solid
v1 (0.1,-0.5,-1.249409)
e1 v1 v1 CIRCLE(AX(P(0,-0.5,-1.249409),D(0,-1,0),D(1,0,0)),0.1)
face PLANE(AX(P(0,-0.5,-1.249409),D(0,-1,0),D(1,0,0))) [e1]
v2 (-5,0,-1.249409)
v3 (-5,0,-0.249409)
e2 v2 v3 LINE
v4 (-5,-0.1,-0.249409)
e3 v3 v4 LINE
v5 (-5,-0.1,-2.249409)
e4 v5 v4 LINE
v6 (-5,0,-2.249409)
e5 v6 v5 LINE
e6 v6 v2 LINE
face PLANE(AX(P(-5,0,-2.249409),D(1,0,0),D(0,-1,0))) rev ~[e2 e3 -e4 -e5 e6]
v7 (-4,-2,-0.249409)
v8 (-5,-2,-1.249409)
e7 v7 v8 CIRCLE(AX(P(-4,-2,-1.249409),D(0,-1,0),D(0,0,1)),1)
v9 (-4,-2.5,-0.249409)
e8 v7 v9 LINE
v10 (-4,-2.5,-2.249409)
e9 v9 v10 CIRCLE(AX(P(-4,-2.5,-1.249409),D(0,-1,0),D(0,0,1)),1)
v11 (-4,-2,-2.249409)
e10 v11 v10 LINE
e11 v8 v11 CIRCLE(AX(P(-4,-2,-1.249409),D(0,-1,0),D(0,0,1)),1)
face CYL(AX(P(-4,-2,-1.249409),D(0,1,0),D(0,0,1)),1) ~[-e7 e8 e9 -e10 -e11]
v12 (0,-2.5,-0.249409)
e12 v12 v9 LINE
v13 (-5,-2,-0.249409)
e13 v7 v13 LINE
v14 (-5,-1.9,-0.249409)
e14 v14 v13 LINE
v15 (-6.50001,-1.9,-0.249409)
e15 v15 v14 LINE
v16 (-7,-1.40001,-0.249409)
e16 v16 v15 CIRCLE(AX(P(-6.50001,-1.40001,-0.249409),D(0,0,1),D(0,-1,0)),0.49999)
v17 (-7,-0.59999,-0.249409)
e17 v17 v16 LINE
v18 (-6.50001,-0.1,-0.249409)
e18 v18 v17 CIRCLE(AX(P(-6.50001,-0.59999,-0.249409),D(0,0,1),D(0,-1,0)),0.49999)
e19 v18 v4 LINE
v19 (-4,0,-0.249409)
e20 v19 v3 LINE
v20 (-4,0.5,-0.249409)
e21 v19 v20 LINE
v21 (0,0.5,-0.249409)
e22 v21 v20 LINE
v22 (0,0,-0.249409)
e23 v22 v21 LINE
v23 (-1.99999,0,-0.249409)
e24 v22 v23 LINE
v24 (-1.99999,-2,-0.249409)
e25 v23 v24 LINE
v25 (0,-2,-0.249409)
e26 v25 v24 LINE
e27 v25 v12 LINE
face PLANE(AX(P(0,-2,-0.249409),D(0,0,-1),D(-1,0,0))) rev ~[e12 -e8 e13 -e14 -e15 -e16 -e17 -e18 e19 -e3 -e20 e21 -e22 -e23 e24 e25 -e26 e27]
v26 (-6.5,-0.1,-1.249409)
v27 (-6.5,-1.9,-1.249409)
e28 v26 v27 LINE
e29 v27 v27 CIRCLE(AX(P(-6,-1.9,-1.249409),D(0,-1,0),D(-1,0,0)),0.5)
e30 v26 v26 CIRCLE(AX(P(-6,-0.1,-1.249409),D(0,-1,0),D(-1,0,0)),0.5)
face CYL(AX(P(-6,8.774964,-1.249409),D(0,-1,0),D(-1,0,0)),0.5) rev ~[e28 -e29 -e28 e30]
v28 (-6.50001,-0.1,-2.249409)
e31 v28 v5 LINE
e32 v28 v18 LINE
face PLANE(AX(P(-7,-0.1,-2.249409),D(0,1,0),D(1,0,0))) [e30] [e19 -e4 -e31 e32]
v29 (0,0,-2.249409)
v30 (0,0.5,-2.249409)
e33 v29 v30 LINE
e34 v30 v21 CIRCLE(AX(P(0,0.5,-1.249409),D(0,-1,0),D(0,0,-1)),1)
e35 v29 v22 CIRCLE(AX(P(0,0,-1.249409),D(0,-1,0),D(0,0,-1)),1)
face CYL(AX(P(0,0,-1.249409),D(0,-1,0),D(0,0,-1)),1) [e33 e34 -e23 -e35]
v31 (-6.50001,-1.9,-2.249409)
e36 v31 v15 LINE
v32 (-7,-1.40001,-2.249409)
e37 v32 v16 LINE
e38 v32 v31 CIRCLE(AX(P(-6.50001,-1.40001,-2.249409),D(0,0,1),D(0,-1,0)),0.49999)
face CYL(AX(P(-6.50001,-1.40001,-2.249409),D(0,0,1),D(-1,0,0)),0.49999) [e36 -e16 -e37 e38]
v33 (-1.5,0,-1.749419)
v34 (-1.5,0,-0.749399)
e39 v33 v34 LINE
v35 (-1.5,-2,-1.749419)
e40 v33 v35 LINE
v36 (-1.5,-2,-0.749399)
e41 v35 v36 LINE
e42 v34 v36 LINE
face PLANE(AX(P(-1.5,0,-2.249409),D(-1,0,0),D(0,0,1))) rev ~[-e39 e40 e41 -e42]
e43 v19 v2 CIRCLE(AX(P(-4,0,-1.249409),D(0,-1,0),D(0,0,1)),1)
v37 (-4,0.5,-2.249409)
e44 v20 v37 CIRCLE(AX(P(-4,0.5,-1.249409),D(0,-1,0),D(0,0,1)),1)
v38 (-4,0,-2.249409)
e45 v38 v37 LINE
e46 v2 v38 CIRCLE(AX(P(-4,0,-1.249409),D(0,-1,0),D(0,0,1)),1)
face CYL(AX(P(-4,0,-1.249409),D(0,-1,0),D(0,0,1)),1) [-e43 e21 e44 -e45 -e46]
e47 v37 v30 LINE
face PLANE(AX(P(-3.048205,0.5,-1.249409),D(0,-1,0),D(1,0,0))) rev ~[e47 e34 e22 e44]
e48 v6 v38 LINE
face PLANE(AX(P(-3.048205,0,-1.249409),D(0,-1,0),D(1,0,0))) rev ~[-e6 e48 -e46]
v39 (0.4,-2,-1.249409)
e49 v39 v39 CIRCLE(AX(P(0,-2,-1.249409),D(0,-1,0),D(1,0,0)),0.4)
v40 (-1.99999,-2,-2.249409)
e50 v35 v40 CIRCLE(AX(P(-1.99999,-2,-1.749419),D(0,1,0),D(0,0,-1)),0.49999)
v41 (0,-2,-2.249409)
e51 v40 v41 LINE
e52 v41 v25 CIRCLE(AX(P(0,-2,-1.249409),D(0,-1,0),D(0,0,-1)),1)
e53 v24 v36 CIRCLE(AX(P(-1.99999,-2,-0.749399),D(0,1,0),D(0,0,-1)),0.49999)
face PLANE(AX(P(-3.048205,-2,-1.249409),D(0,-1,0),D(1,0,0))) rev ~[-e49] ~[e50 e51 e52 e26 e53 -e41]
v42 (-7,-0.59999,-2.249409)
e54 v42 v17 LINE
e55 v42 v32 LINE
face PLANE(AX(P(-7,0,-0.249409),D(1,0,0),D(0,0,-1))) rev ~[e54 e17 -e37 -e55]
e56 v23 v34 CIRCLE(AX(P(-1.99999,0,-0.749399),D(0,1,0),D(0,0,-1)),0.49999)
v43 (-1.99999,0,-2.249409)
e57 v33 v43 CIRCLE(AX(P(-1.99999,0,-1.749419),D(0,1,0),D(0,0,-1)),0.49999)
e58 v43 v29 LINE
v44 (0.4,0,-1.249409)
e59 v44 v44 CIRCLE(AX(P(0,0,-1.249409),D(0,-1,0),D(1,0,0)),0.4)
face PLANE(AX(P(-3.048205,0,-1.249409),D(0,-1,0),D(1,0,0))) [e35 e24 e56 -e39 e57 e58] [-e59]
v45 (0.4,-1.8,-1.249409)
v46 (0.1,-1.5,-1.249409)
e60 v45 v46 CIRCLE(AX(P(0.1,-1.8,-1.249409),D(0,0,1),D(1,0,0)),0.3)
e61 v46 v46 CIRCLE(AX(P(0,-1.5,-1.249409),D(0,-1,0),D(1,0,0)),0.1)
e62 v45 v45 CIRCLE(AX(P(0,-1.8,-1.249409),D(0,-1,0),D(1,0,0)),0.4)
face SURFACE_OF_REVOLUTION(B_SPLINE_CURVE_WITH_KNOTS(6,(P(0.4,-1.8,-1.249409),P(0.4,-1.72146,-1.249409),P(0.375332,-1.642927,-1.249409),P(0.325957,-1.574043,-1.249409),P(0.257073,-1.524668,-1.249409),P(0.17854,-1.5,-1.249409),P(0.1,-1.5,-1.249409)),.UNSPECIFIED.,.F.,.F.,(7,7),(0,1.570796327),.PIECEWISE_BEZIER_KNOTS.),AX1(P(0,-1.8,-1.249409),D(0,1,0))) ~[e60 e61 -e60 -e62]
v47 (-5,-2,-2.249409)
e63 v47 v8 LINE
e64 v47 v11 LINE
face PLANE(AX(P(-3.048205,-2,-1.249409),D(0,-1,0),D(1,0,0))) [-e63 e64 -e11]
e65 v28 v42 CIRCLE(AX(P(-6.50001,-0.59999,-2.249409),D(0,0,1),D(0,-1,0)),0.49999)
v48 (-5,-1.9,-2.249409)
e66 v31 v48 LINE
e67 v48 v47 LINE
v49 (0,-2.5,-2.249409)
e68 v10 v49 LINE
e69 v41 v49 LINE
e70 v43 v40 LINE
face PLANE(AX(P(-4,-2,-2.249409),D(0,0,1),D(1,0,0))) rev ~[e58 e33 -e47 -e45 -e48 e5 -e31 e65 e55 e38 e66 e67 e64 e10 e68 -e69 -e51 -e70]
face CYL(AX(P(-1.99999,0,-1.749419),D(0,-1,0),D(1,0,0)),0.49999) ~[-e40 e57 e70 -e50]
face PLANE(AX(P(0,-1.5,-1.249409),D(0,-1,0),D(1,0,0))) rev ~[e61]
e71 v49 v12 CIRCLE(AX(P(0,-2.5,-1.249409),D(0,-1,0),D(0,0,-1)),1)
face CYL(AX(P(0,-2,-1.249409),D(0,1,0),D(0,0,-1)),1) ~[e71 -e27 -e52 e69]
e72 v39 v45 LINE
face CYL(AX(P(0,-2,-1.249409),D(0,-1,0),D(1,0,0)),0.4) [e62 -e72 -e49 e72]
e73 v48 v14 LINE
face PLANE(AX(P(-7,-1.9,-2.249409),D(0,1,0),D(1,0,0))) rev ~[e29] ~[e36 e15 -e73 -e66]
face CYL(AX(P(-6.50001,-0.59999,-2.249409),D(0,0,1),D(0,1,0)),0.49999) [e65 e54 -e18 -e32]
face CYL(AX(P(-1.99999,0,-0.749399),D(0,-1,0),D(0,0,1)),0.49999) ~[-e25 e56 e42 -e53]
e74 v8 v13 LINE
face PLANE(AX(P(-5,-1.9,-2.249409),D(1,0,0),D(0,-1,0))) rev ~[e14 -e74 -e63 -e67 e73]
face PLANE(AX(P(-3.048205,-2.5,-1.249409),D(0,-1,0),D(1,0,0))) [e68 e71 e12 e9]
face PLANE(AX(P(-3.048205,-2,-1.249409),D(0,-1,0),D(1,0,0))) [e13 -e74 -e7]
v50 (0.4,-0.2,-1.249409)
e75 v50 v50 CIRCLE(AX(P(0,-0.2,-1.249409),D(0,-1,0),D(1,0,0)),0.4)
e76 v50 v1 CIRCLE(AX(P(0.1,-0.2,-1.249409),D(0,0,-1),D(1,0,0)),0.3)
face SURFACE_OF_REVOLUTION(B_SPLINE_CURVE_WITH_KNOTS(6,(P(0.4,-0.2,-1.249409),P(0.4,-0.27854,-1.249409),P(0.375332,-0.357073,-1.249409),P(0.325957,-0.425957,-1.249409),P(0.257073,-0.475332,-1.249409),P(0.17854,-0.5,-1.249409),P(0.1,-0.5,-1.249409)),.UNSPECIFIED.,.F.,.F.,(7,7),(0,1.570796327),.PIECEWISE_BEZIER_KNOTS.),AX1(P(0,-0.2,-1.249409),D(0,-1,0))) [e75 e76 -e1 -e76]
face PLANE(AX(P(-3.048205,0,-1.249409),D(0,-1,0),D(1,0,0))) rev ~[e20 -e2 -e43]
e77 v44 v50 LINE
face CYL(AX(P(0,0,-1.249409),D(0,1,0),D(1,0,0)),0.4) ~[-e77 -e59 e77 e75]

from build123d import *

# Parameters (mm, degrees)
F0_R      = 0.5
F1_DEPTH  = 2
F0_R_2    = 0.4
F2_DEPTH  = 0.5
F3_R      = 0.4
F4_DEPTH  = 0.5
F5_D      = 1
F6_DEPTH  = 0.5
F7_DEPTH  = 0.5
F8_R      = 0.3
F9_W      = 2
F9_H      = 0.1
F10_DEPTH = 25
F11_R     = 0.49999


# Not quite as in the source:
# - a fillet or chamfer is up to 0.001 mm smaller than in the source, because OpenCascade refuses the exact size
# - a feature names something its author has since deleted; it is built from what else it names


with BuildPart() as f1:
    # F0 (on Front) → F1 (new body)
    with BuildSketch(Plane.XZ):
        with BuildLine():
            Line((-1.5, -1.2454767711), (-1.5, -0.24940907))
            Line((-1.5, -0.24940907), (-4, -0.24940907))
            ThreePointArc((-4, -0.24940907), (-5, -1.24940907), (-4, -2.24940907))
            Line((-4, -2.24940907), (-1.5, -2.24940907))
            Line((-1.5, -2.24940907), (-1.5, -1.2454767711))
        make_face()
        with BuildLine():
            ThreePointArc((-4, -2.24940907), (-5, -1.24940907), (-4, -0.24940907))
            Line((-4, -0.24940907), (-7, -0.24940907))
            Line((-7, -0.24940907), (-7, -2.24940907))
            Line((-7, -2.24940907), (-4, -2.24940907))
        make_face()
        with Locations((-6, -1.24940907)):
            Circle(F0_R, mode=Mode.SUBTRACT)
        with Locations((-6, -1.24940907)):
            Circle(F0_R)
    extrude(amount=F1_DEPTH)

    # F0 (on Front) → F2 (join)
    with BuildSketch(Plane.XZ):
        with BuildLine():
            Line((-1.5, -1.2454767711), (-1.5, -0.24940907))
            Line((-1.5, -0.24940907), (-4, -0.24940907))
            ThreePointArc((-4, -0.24940907), (-5, -1.24940907), (-4, -2.24940907))
            Line((-4, -2.24940907), (-1.5, -2.24940907))
            Line((-1.5, -2.24940907), (-1.5, -1.2454767711))
        make_face()
        with BuildLine():
            Line((0, -0.24940907), (-1, -0.24940907))
            Line((-1, -0.24940907), (-1, -2.24940907))
            Line((-1, -2.24940907), (0, -2.24940907))
            ThreePointArc((0, -2.24940907), (1, -1.24940907), (0, -0.24940907))
        make_face()
        with Locations((0, -1.24940907)):
            Circle(F0_R_2, mode=Mode.SUBTRACT)
        Polygon((-1, -2.24940907), (-1, -0.24940907), (-1.5, -0.24940907), (-1.5, -1.2454767711), (-1.5, -2.24940907), align=None)
        with Locations((0, -1.24940907)):
            Circle(F0_R_2)
    extrude(amount=-F2_DEPTH)

    # F3 (on face) → F4 (join)
    with BuildSketch(Plane.XZ.offset(2)):
        with BuildLine():
            Line((-1.5, -2.24940907), (-1.5, -0.24940907))
            Line((-1.5, -0.24940907), (-4, -0.24940907))
            ThreePointArc((-4, -0.24940907), (-5, -1.24940907), (-4, -2.24940907))
            Line((-4, -2.24940907), (-1.5, -2.24940907))
        make_face()
        with BuildLine():
            Line((0, -0.24940907), (-1, -0.24940907))
            Line((-1, -0.24940907), (-1.5, -0.24940907))
            Line((-1.5, -0.24940907), (-1.5, -2.24940907))
            Line((-1.5, -2.24940907), (0, -2.24940907))
            ThreePointArc((0, -2.24940907), (1, -1.24940907), (0, -0.24940907))
        make_face()
        with Locations((0, -1.24940907)):
            Circle(F3_R, mode=Mode.SUBTRACT)
        with Locations((0, -1.24940907)):
            Circle(F3_R)
    extrude(amount=F4_DEPTH)

    # F5 (through all)
    with Locations(Plane(origin=(0, 0, 0), x_dir=(1, 0, 0), z_dir=(0, 1, 0))):
        with Locations((-6, 1.24940907)):
            Hole(F5_D / 2)

    # F0 (on Front) → F6 (join)
    with BuildSketch(Plane.XZ):
        with Locations((0, -1.24940907)):
            Circle(F0_R_2)
    extrude(amount=F6_DEPTH)

    # F3 (on face) → F7 (join)
    with BuildSketch(Plane.XZ.offset(2)):
        with Locations((0, -1.24940907)):
            Circle(F3_R)
    extrude(amount=-F7_DEPTH)

    # F8
    f8_edges = [f1.edges().sort_by_distance(p)[0] for p in [
        (-0.4, -0.5, -1.249409),
        (-0.4, -1.5, -1.249409),
    ]]
    fillet(f8_edges, radius=F8_R)

    # F9 (on face) → F10 (cut)
    with BuildSketch(Plane(origin=(0, 0, -2.24940907), x_dir=(1, 0, 0), z_dir=(0, 0, -1))):
        with Locations((-6, 1.95)):
            Rectangle(F9_W, F9_H)
        with Locations((-6, 0.05)):
            Rectangle(F9_W, F9_H)
    extrude(amount=-F10_DEPTH, mode=Mode.SUBTRACT)

    # F11 (radius 0.5 in the source; OpenCascade refuses exactly that, so slightly less here)
    f11_edges = [f1.edges().sort_by_distance(p)[0] for p in [
        (-7, -1.9, -1.249409),
        (-7, -0.1, -1.249409),
        (-1.5, -1, -0.249409),
        (-1.5, -1, -2.249409),
    ]]
    fillet(f11_edges, radius=F11_R)


solid = f1.part
